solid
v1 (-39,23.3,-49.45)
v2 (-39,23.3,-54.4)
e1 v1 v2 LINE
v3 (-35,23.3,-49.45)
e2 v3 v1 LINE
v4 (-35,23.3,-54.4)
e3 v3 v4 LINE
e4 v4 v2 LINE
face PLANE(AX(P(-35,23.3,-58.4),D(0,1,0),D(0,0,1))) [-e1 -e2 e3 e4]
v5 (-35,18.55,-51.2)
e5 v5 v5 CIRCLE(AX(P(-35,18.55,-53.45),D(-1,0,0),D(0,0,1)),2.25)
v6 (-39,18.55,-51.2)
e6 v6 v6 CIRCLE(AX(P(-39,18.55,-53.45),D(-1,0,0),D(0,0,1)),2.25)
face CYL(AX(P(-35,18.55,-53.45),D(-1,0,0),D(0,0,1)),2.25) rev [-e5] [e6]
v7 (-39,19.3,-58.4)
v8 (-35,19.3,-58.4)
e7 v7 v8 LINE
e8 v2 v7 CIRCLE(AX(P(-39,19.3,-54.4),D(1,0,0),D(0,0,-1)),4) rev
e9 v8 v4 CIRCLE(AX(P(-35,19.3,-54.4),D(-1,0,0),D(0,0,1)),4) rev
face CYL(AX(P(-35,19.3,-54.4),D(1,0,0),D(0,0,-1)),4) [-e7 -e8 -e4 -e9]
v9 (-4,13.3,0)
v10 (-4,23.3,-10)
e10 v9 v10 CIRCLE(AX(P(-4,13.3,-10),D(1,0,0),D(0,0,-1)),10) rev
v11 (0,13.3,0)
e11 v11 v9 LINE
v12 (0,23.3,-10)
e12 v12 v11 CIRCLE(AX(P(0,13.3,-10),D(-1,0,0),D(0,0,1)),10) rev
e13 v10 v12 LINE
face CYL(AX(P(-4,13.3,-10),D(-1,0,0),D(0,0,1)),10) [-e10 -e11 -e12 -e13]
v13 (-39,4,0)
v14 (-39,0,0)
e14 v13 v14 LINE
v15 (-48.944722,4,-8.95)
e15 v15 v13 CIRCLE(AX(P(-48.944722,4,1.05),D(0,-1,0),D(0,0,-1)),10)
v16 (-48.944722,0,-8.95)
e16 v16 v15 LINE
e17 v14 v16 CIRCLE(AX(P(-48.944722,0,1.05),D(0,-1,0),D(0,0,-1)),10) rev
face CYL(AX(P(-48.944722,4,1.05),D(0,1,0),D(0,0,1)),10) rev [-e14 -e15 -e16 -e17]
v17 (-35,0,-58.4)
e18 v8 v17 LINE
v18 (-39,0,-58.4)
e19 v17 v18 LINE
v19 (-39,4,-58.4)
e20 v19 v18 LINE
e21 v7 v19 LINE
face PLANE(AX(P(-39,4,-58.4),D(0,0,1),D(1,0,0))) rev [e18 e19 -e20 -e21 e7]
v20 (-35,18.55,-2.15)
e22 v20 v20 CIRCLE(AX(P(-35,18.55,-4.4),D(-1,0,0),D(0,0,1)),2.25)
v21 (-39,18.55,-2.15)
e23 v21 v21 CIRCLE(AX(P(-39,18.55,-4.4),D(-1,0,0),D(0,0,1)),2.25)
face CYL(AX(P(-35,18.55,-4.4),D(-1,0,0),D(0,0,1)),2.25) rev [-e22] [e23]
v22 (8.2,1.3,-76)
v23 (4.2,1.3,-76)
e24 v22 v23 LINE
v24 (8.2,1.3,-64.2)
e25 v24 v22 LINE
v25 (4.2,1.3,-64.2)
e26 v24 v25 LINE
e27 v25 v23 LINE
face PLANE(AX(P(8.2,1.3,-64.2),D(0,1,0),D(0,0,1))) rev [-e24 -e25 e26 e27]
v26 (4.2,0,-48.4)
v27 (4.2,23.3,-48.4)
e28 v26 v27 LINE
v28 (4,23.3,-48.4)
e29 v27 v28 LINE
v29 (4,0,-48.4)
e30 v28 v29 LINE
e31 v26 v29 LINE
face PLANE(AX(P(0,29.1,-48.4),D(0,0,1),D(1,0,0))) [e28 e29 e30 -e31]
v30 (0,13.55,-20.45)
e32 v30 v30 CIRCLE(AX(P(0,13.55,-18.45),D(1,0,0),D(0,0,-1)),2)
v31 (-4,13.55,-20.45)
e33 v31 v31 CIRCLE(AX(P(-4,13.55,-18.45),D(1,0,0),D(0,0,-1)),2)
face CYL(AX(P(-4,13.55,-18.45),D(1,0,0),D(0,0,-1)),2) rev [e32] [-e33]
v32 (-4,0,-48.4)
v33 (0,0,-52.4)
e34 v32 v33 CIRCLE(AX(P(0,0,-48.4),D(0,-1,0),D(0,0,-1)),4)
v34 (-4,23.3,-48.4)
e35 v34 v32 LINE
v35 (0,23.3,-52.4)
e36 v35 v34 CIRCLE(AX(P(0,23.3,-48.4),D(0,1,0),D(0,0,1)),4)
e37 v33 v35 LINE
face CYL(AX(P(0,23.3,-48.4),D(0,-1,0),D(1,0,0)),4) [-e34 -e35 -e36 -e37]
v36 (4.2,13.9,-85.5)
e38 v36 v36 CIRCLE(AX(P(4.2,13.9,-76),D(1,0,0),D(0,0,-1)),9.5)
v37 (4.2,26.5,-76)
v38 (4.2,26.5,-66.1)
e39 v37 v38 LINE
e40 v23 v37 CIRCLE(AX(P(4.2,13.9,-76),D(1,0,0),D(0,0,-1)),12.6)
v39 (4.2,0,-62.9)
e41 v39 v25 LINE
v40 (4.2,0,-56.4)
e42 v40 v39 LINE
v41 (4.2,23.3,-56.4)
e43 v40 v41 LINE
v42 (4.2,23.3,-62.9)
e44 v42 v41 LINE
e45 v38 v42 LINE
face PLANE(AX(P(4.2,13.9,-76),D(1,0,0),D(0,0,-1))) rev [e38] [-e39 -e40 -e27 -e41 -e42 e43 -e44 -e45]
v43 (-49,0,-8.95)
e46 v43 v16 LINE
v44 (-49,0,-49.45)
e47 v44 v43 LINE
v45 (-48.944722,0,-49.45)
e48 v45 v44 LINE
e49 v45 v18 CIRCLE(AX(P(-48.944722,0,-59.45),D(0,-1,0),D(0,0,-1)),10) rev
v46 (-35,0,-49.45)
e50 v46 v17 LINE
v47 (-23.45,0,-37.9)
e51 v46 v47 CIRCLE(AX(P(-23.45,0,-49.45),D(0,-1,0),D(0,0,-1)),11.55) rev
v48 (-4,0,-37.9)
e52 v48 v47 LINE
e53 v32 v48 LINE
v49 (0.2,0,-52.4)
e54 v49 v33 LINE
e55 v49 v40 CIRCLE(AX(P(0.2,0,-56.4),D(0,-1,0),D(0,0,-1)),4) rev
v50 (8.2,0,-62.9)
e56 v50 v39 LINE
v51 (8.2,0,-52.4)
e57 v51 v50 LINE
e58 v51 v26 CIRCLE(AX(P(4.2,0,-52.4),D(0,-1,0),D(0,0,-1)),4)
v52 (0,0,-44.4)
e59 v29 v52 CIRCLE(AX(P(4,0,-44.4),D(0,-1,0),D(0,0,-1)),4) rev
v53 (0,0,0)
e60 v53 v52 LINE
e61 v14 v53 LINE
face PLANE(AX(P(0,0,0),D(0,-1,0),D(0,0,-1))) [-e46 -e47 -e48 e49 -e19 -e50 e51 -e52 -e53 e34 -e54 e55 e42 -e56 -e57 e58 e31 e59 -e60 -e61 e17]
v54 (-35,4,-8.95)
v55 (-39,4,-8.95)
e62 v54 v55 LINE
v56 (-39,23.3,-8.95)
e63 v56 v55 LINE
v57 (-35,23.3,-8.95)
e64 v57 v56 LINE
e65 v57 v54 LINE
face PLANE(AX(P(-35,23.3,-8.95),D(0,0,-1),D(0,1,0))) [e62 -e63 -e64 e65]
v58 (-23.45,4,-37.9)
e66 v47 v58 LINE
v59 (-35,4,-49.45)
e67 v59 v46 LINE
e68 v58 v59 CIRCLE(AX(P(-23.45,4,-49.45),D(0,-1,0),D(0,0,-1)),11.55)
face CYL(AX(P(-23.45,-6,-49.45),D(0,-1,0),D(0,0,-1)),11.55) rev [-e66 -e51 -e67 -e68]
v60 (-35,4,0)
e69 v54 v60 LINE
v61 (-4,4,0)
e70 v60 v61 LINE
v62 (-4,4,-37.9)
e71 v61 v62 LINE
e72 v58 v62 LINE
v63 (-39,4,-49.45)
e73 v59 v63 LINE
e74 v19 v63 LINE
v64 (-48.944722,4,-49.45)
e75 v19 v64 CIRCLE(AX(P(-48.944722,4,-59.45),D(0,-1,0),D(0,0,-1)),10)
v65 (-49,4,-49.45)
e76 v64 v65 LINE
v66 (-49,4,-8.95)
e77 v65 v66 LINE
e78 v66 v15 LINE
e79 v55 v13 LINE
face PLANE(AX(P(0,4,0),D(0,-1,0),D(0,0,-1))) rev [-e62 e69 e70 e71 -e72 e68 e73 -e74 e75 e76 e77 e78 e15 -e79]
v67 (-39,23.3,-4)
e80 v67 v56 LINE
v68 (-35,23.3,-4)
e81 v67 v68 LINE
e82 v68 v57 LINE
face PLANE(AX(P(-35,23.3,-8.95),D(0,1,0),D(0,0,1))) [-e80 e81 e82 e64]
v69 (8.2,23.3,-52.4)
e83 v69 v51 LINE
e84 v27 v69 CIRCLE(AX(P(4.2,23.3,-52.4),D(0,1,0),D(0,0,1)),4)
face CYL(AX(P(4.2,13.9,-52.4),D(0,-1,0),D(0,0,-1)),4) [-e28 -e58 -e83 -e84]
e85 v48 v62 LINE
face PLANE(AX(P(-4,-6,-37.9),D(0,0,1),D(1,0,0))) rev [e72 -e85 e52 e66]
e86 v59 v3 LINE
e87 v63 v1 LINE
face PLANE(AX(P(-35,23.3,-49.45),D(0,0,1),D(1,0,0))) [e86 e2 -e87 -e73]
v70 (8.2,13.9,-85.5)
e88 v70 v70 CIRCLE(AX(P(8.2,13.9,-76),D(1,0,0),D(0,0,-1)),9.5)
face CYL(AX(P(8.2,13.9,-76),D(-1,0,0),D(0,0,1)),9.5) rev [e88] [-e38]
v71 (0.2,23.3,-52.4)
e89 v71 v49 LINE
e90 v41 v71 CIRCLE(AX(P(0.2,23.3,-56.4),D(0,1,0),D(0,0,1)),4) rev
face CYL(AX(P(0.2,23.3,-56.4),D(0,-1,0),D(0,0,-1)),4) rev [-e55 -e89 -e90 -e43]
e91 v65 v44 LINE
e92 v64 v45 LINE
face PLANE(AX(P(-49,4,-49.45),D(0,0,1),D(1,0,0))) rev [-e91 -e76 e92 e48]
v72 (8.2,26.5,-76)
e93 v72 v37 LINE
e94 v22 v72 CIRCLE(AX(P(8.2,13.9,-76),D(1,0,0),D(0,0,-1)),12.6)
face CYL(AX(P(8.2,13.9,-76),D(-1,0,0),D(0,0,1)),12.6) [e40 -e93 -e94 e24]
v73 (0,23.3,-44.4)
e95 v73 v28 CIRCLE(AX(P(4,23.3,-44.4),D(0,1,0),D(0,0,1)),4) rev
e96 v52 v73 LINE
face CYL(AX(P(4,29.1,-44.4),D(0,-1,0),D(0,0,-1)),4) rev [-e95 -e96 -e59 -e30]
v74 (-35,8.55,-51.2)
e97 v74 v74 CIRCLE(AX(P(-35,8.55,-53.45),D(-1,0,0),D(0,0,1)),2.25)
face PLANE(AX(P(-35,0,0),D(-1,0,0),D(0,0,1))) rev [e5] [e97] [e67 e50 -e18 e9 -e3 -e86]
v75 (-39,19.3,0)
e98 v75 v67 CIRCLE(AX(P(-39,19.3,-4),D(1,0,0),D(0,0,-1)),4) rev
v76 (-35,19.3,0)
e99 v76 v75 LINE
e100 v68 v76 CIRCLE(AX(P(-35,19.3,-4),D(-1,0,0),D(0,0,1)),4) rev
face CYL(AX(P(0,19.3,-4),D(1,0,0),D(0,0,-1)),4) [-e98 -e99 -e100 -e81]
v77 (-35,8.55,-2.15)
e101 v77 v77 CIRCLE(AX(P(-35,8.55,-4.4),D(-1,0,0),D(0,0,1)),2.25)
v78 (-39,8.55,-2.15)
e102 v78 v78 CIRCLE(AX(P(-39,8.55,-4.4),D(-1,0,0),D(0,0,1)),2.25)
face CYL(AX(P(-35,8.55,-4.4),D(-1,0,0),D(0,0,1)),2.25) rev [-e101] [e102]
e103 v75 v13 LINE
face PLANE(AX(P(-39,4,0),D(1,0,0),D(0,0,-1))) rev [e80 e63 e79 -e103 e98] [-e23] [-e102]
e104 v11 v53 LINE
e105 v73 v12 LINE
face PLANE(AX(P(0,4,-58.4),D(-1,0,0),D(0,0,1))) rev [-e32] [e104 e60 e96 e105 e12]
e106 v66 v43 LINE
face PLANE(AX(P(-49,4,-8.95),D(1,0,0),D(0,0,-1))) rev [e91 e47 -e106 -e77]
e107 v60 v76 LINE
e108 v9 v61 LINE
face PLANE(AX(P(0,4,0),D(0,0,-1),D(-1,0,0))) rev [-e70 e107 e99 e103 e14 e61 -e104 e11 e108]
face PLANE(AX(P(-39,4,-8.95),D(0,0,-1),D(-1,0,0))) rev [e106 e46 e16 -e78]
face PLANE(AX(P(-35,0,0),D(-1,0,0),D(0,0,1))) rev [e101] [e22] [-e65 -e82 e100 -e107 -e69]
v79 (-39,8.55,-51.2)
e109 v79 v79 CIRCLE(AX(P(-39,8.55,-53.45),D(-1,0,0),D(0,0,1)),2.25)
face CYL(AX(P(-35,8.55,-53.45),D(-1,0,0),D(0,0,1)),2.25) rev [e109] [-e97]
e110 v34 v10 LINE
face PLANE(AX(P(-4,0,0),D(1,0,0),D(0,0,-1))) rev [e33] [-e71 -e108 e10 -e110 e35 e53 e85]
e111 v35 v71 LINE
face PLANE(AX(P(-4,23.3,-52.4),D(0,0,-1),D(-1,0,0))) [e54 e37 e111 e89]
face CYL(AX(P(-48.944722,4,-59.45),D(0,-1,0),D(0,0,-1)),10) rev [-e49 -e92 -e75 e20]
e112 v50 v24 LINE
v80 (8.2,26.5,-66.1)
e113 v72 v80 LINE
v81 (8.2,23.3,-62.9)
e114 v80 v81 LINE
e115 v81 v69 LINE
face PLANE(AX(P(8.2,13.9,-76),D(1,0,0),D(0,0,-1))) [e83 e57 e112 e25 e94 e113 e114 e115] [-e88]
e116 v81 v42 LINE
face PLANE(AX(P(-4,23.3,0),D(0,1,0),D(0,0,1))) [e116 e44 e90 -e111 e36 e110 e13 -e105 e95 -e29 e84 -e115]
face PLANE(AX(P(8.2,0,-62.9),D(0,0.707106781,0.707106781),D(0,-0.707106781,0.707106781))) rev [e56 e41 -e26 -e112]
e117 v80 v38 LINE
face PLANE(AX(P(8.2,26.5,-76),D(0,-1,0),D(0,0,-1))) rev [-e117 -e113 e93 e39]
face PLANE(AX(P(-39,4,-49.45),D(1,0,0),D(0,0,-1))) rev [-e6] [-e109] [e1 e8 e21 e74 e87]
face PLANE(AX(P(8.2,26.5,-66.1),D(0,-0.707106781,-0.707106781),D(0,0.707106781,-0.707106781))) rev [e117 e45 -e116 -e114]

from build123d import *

# Parameters (mm, degrees)
BOSS_EXTRUDE1_DEPTH = 4
SKETCH2_W           = 8.95
SKETCH2_H           = 19.3
SKETCH2_R           = 2.25
BOSS_EXTRUDE2_DEPTH = 4
FILLET1_R           = 10
FILLET2_R           = 4
SKETCH3_W           = 52.4
SKETCH3_H           = 19.3
SKETCH3_R           = 2
BOSS_EXTRUDE3_DEPTH = 4
FILLET3_R           = 10
SKETCH4_W           = 31
SKETCH4_H           = 20.5
CUT_EXTRUDE1_DEPTH  = 10
SKETCH5_W           = 4
SKETCH5_H           = 6
CUT_EXTRUDE2_DEPTH  = 10
FILLET4_R           = 11.55
SKETCH6_W           = 4.2
SKETCH6_H           = 4
BOSS_EXTRUDE4_DEPTH = 23.3
SKETCH7_R           = 9.5
BOSS_EXTRUDE5_DEPTH = 4
FILLET6_R           = 4


with BuildPart() as part:
    # Sketch1 → Boss-Extrude1 (new body)
    with BuildSketch(Plane(origin=(0, 0, 0), x_dir=(1, 0, 0), z_dir=(0, 1, 0))):
        Polygon((-49, 49.45), (-39, 49.45), (-39, 58.4), (0, 58.4), (0, 0), (-39, 0), (-39, 8.95), (-49, 8.95), align=None)
    extrude(amount=BOSS_EXTRUDE1_DEPTH)

    # Sketch2 → Boss-Extrude2 (add)
    # profile 1 of 2: a face of its own
    with BuildSketch(Plane.ZY.offset(39)):
        with Locations((-4.475, 13.65)):
            Rectangle(SKETCH2_W, SKETCH2_H)
        with Locations((-4.4, 18.55)):
            Circle(SKETCH2_R, mode=Mode.SUBTRACT)
        with Locations((-4.4, 8.55)):
            Circle(SKETCH2_R, mode=Mode.SUBTRACT)
    # profile 2 of 2: a face of its own
    with BuildSketch(Plane.ZY.offset(39)):
        with Locations((-53.925, 13.65)):
            Rectangle(SKETCH2_W, SKETCH2_H)
        with Locations((-53.45, 18.55)):
            Circle(SKETCH2_R, mode=Mode.SUBTRACT)
        with Locations((-53.45, 8.55)):
            Circle(SKETCH2_R, mode=Mode.SUBTRACT)
    extrude(amount=-BOSS_EXTRUDE2_DEPTH)

    # Fillet1
    # the kernel refuses this fillet: 10 mm, written as the material it adds along each edge
    with BuildSketch(Plane(origin=(-39, 0, -49.45), x_dir=(-1, 0, 0), z_dir=(0, 1, 0))) as fillet1_piece_1:
        with BuildLine():
            CenterArc((9.944722218, -10), FILLET1_R, 90, 83.97283344)
            Line((0, -8.95), (0, 0))
            Line((0, 0), (9.944722218, 0))
        make_face()
    extrude(amount=4)
    with BuildSketch(Plane(origin=(-39, 0, -8.95), x_dir=(0, 0, 1), z_dir=(0, 1, 0))) as fillet1_piece_2:
        with BuildLine():
            CenterArc((10, -9.944722218), FILLET1_R, 96.02716656, 83.97283344)
            Line((0, -9.944722218), (0, 0))
            Line((0, 0), (8.95, 0))
        make_face()
    extrude(amount=4)

    # Fillet2
    fillet2_edges = [part.edges().sort_by_distance(p)[0] for p in [
        (-37, 23.3, 0),
        (-37, 23.3, -58.4),
    ]]
    fillet(fillet2_edges, radius=FILLET2_R)

    # Sketch3 → Boss-Extrude3 (add)
    with BuildSketch(Plane(origin=(0, 0, 0), x_dir=(0, 0, -1), z_dir=(1, 0, 0))):
        with Locations((26.2, 13.65)):
            Rectangle(SKETCH3_W, SKETCH3_H)
        with Locations((18.45, 13.55)):
            Circle(SKETCH3_R, mode=Mode.SUBTRACT)
    extrude(amount=-BOSS_EXTRUDE3_DEPTH)

    # Fillet3
    fillet3_edges = [part.edges().sort_by_distance(p)[0] for p in [
        (-2, 23.3, 0),
    ]]
    fillet(fillet3_edges, radius=FILLET3_R)

    # Sketch4 → Cut-Extrude1 (cut)
    with BuildSketch(Plane(origin=(0, 4, 0), x_dir=(1, 0, 0), z_dir=(0, 1, 0))):
        with Locations((-19.5, 48.15)):
            Rectangle(SKETCH4_W, SKETCH4_H)
    extrude(amount=-CUT_EXTRUDE1_DEPTH, mode=Mode.SUBTRACT)

    # Sketch5 → Cut-Extrude2 (cut)
    with BuildSketch(Plane(origin=(0, 4, 0), x_dir=(1, 0, 0), z_dir=(0, 1, 0))):
        with Locations((-2, 55.4)):
            Rectangle(SKETCH5_W, SKETCH5_H)
    extrude(amount=-CUT_EXTRUDE2_DEPTH, mode=Mode.SUBTRACT)

    # Fillet4
    fillet4_edges = [part.edges().sort_by_distance(p)[0] for p in [
        (-35, 2, -37.9),
    ]]
    fillet(fillet4_edges, radius=FILLET4_R)

    # Sketch6 → Boss-Extrude4 (add)
    with BuildSketch(Plane.XZ):
        with Locations((2.1, -50.4)):
            Rectangle(SKETCH6_W, SKETCH6_H)
    extrude(amount=-BOSS_EXTRUDE4_DEPTH)

    # Sketch7 → Boss-Extrude5 (add)
    with BuildSketch(Plane(origin=(4.2, 0, 0), x_dir=(0, 0, -1), z_dir=(1, 0, 0))):
        with BuildLine():
            Line((48.4, 0), (48.4, 23.3))
            Line((48.4, 23.3), (62.9, 23.3))
            Line((62.9, 23.3), (66.1, 26.5))
            Line((66.1, 26.5), (76, 26.5))
            ThreePointArc((76, 26.5), (88.6, 13.9), (76, 1.3))
            Line((76, 1.3), (64.2, 1.3))
            Line((64.2, 1.3), (62.9, 0))
            Line((62.9, 0), (48.4, 0))
        make_face()
        with Locations((76, 13.9)):
            Circle(SKETCH7_R, mode=Mode.SUBTRACT)
    extrude(amount=BOSS_EXTRUDE5_DEPTH)

    # Fillet6
    fillet6_edges = [part.edges().sort_by_distance(p)[0] for p in [
        (4.2, 11.65, -52.4),
        (0, 11.65, -48.4),
        (8.2, 11.65, -48.4),
        (-4, 11.65, -52.4),
    ]]
    fillet(fillet6_edges, radius=FILLET6_R)


solid = part.part
